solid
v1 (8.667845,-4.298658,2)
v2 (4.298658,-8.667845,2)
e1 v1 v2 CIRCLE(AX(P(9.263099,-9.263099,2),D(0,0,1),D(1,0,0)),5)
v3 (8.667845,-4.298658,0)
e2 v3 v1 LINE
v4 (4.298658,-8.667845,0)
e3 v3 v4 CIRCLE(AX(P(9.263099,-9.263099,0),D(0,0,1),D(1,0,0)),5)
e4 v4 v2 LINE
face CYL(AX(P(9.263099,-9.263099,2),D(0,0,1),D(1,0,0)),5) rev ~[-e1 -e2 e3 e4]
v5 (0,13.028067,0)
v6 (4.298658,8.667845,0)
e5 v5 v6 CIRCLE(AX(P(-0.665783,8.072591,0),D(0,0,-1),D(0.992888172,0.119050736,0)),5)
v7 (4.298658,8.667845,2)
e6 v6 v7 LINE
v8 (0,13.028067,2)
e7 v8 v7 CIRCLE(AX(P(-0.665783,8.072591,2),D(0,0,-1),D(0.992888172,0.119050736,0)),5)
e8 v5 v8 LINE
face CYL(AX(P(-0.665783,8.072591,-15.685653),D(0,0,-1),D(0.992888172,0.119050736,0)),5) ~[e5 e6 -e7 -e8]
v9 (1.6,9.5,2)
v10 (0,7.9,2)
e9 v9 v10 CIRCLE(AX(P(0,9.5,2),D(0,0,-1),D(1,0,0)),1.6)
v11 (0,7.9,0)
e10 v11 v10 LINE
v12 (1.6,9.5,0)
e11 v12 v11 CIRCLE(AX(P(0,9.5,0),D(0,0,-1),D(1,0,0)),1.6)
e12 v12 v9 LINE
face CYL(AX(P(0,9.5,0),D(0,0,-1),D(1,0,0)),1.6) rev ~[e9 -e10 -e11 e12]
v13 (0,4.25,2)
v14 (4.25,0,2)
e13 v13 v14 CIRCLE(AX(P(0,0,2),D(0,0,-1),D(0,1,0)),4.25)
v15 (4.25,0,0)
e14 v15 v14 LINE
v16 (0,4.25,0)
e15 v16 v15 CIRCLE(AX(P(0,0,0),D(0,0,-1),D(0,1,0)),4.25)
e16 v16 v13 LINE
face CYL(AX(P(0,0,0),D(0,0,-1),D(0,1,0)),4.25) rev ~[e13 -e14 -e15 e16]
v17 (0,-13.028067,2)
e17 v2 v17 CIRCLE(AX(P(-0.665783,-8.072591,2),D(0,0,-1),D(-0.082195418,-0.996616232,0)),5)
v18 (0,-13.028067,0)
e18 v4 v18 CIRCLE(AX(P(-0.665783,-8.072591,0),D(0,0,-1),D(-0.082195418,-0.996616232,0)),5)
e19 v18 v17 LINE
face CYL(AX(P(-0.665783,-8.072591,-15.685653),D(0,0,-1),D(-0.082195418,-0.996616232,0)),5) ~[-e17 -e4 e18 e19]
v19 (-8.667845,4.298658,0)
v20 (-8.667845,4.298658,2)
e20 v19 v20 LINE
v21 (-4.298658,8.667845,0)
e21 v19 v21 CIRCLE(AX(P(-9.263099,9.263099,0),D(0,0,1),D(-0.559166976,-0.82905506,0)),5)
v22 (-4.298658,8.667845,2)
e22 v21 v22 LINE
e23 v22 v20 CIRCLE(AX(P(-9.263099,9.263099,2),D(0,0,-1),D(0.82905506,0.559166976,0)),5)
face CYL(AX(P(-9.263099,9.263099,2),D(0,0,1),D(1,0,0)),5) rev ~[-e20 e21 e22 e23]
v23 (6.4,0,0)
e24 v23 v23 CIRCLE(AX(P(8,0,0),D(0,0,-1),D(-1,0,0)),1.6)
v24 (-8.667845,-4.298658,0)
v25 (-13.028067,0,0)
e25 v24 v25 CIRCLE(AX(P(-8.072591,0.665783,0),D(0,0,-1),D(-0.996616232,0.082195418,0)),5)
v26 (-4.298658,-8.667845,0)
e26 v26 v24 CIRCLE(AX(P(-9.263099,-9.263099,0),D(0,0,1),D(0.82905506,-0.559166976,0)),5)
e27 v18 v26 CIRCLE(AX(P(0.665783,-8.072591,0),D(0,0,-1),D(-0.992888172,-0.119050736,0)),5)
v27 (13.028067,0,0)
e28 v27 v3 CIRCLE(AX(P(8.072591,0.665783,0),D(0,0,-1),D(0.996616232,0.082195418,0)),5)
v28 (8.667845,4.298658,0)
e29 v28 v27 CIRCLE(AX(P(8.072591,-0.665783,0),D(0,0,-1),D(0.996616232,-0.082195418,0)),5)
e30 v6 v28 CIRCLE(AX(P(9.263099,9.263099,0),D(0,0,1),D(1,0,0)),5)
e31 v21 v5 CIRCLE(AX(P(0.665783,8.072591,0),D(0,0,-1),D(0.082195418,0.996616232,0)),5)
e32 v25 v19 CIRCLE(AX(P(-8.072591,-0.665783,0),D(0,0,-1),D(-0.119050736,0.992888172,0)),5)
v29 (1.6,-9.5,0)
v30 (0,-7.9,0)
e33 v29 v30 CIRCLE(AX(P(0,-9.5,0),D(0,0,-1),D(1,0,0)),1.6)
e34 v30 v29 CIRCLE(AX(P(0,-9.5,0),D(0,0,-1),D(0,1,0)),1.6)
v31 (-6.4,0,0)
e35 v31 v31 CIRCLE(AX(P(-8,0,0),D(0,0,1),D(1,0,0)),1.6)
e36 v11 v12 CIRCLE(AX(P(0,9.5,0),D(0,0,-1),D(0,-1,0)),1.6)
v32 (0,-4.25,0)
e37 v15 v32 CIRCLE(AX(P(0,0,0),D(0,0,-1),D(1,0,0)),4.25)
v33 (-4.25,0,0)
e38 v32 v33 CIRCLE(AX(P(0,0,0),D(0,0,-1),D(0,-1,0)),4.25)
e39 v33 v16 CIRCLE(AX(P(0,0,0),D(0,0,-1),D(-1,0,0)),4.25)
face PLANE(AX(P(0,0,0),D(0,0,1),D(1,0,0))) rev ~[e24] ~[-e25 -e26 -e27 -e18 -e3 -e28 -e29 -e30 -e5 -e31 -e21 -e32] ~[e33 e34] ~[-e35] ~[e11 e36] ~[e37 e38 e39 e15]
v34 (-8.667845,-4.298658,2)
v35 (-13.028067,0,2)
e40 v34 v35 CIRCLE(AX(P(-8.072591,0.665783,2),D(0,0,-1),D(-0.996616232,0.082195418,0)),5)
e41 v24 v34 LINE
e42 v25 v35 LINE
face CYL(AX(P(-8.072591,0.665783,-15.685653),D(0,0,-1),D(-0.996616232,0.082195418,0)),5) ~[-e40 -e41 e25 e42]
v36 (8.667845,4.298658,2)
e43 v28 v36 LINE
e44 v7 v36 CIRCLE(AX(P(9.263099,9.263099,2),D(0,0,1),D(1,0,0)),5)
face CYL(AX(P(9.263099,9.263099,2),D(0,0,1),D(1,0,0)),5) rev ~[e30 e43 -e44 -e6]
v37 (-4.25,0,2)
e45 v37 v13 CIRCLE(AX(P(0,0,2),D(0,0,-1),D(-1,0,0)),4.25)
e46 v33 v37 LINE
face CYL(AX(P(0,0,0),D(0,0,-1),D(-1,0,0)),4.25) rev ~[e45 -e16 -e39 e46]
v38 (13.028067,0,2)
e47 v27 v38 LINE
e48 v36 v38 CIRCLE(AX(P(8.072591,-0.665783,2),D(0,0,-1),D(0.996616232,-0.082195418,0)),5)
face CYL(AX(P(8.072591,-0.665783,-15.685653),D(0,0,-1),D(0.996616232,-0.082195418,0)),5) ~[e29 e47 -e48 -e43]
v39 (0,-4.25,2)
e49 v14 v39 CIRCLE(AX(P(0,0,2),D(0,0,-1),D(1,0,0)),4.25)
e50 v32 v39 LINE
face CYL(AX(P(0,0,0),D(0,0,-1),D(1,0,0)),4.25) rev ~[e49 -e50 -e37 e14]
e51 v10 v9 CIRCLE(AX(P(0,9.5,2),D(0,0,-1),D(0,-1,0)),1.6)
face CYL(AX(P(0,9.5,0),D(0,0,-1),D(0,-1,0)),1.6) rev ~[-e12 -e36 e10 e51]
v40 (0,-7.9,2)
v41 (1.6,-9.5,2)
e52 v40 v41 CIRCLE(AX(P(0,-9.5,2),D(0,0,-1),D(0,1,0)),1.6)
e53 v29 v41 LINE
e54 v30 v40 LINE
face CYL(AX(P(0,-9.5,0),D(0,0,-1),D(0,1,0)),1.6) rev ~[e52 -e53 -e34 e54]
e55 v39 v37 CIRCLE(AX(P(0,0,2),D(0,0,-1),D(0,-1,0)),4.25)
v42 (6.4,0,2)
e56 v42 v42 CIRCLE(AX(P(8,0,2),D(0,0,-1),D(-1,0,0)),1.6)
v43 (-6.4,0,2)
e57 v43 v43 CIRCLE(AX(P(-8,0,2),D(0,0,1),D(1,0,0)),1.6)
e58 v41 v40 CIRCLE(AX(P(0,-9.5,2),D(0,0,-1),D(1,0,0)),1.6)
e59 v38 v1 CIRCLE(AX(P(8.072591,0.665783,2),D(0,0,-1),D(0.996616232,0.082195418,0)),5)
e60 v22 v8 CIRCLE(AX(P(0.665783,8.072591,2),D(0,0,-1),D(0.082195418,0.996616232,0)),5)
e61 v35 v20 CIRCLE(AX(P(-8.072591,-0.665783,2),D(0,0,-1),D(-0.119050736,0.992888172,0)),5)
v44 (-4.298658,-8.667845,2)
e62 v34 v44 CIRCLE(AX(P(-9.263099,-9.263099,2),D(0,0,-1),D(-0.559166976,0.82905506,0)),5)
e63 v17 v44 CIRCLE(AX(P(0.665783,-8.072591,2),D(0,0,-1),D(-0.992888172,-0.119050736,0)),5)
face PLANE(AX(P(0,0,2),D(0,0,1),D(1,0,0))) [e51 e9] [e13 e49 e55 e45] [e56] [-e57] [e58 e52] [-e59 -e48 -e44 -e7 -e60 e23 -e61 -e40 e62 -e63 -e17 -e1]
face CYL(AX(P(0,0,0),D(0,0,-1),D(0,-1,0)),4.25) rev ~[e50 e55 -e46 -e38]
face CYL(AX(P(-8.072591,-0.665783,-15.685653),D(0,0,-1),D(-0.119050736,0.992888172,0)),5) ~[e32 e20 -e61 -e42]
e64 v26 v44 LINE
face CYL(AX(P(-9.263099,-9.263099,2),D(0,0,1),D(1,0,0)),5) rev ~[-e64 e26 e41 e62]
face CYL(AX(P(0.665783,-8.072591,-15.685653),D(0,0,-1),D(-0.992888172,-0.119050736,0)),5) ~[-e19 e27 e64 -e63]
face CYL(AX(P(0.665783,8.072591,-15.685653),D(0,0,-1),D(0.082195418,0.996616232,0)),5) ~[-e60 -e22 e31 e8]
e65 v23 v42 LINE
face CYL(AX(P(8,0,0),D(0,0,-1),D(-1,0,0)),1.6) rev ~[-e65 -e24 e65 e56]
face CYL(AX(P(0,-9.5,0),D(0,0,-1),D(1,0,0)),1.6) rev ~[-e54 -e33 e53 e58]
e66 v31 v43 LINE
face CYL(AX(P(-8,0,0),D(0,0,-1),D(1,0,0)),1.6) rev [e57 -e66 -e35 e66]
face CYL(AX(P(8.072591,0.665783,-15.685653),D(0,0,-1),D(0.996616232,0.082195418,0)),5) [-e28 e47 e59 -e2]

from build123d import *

# Parameters (mm, degrees)
F1_R        = 13.1
F1_R_2      = 1.6
F2_DEPTH    = 2
F3_R        = 5
F4_DEPTH    = 25
F5_T1_DEPTH = 33.3713058975


# Not quite as in the source:
# - a fillet or chamfer that OpenCascade refuses, or shapes differently, is made with other operations: its cross-section is extruded or revolved along the edge and cut away or added


with BuildPart() as f2:
    # F1 (on Top) → F2 (new body)
    with BuildSketch(Plane.XY):
        Circle(F1_R)
        with BuildLine():
            ThreePointArc((1.6, -9.5), (-1.1313708499, -10.6313708499), (0, -7.9))
            ThreePointArc((0, -7.9), (1.1313708499, -8.3686291501), (1.6, -9.5))
        make_face(mode=Mode.SUBTRACT)
        with Locations((-8, 0)):
            Circle(F1_R_2, mode=Mode.SUBTRACT)
        with BuildLine():
            ThreePointArc((-4.25, 0), (-3.00520382, 3.00520382), (0, 4.25))
            ThreePointArc((0, 4.25), (3.00520382, 3.00520382), (4.25, 0))
            ThreePointArc((4.25, 0), (3.00520382, -3.00520382), (0, -4.25))
            ThreePointArc((0, -4.25), (-3.00520382, -3.00520382), (-4.25, 0))
        make_face(mode=Mode.SUBTRACT)
        with BuildLine():
            ThreePointArc((9.6, 0), (8, -1.6), (6.4, 0))
            ThreePointArc((6.4, 0), (8, 1.6), (9.6, 0))
        make_face(mode=Mode.SUBTRACT)
        with BuildLine():
            ThreePointArc((1.6, 9.5), (1.1313708499, 8.3686291501), (0, 7.9))
            ThreePointArc((0, 7.9), (-1.1313708499, 10.6313708499), (1.6, 9.5))
        make_face(mode=Mode.SUBTRACT)
    extrude(amount=F2_DEPTH)

    # F3 (on face) → F4 (cut)
    with BuildSketch(Plane.XY.offset(2)):
        with Locations((-9.2630988335, 9.2630988335)):
            Circle(F3_R)
        with Locations((9.2630988335, -9.2630988335)):
            Circle(F3_R)
        with Locations((-9.2630988335, -9.2630988335)):
            Circle(F3_R)
        with Locations((9.2630988335, 9.2630988335)):
            Circle(F3_R)
    extrude(amount=-F4_DEPTH, mode=Mode.SUBTRACT)

    # F5: fillet of radius 5 on 8 edges, made by hand

    # F5_s2 → F5_t1 (cut)
    with BuildSketch(Plane.XY.offset(-15.6856529487)):
        with BuildLine():
            ThreePointArc((1.0767599787, 13.0556726348), (-2.4959833234, 11.9459923629), (-4.298657973, 8.667845155))
            ThreePointArc((-4.298657973, 8.667845155), (-4.4028928152, 10.437150561), (-5.1178235319, 12.0589337131))
            ThreePointArc((-5.1178235319, 12.0589337131), (-2.0810864422, 12.9336413751), (1.0767599787, 13.0556726348))
        make_face()
        with BuildLine():
            ThreePointArc((-8.667845155, 4.298657973), (-11.9459923629, 2.4959833234), (-13.0556726348, -1.0767599787))
            ThreePointArc((-13.0556726348, -1.0767599787), (-12.9336413751, 2.0810864422), (-12.0589337131, 5.1178235319))
            ThreePointArc((-12.0589337131, 5.1178235319), (-10.437150561, 4.4028928152), (-8.667845155, 4.298657973))
        make_face()
        with BuildLine():
            ThreePointArc((13.0556726348, -1.0767599787), (11.9459923629, 2.4959833234), (8.667845155, 4.298657973))
            ThreePointArc((8.667845155, 4.298657973), (10.437150561, 4.4028928152), (12.0589337131, 5.1178235319))
            ThreePointArc((12.0589337131, 5.1178235319), (12.9336413751, 2.0810864422), (13.0556726348, -1.0767599787))
        make_face()
        with BuildLine():
            ThreePointArc((4.298657973, 8.667845155), (2.4959833234, 11.9459923629), (-1.0767599787, 13.0556726348))
            ThreePointArc((-1.0767599787, 13.0556726348), (2.0810864422, 12.9336413751), (5.1178235319, 12.0589337131))
            ThreePointArc((5.1178235319, 12.0589337131), (4.4028928152, 10.437150561), (4.298657973, 8.667845155))
        make_face()
        with BuildLine():
            ThreePointArc((13.0556726348, 1.0767599787), (11.9459923629, -2.4959833234), (8.667845155, -4.298657973))
            ThreePointArc((8.667845155, -4.298657973), (10.437150561, -4.4028928152), (12.0589337131, -5.1178235319))
            ThreePointArc((12.0589337131, -5.1178235319), (12.9336413751, -2.0810864422), (13.0556726348, 1.0767599787))
        make_face()
        with BuildLine():
            ThreePointArc((-1.0767599787, -13.0556726348), (2.4959833234, -11.9459923629), (4.298657973, -8.667845155))
            ThreePointArc((4.298657973, -8.667845155), (4.4028928152, -10.437150561), (5.1178235319, -12.0589337131))
            ThreePointArc((5.1178235319, -12.0589337131), (2.0810864422, -12.9336413751), (-1.0767599787, -13.0556726348))
        make_face()
        with BuildLine():
            ThreePointArc((-13.0556726348, 1.0767599787), (-11.9459923629, -2.4959833234), (-8.667845155, -4.298657973))
            ThreePointArc((-8.667845155, -4.298657973), (-10.437150561, -4.4028928152), (-12.0589337131, -5.1178235319))
            ThreePointArc((-12.0589337131, -5.1178235319), (-12.9336413751, -2.0810864422), (-13.0556726348, 1.0767599787))
        make_face()
        with BuildLine():
            ThreePointArc((-4.298657973, -8.667845155), (-2.4959833234, -11.9459923629), (1.0767599787, -13.0556726348))
            ThreePointArc((1.0767599787, -13.0556726348), (-2.0810864422, -12.9336413751), (-5.1178235319, -12.0589337131))
            ThreePointArc((-5.1178235319, -12.0589337131), (-4.4028928152, -10.437150561), (-4.298657973, -8.667845155))
        make_face()
    extrude(amount=F5_T1_DEPTH, mode=Mode.SUBTRACT)


solid = f2.part
